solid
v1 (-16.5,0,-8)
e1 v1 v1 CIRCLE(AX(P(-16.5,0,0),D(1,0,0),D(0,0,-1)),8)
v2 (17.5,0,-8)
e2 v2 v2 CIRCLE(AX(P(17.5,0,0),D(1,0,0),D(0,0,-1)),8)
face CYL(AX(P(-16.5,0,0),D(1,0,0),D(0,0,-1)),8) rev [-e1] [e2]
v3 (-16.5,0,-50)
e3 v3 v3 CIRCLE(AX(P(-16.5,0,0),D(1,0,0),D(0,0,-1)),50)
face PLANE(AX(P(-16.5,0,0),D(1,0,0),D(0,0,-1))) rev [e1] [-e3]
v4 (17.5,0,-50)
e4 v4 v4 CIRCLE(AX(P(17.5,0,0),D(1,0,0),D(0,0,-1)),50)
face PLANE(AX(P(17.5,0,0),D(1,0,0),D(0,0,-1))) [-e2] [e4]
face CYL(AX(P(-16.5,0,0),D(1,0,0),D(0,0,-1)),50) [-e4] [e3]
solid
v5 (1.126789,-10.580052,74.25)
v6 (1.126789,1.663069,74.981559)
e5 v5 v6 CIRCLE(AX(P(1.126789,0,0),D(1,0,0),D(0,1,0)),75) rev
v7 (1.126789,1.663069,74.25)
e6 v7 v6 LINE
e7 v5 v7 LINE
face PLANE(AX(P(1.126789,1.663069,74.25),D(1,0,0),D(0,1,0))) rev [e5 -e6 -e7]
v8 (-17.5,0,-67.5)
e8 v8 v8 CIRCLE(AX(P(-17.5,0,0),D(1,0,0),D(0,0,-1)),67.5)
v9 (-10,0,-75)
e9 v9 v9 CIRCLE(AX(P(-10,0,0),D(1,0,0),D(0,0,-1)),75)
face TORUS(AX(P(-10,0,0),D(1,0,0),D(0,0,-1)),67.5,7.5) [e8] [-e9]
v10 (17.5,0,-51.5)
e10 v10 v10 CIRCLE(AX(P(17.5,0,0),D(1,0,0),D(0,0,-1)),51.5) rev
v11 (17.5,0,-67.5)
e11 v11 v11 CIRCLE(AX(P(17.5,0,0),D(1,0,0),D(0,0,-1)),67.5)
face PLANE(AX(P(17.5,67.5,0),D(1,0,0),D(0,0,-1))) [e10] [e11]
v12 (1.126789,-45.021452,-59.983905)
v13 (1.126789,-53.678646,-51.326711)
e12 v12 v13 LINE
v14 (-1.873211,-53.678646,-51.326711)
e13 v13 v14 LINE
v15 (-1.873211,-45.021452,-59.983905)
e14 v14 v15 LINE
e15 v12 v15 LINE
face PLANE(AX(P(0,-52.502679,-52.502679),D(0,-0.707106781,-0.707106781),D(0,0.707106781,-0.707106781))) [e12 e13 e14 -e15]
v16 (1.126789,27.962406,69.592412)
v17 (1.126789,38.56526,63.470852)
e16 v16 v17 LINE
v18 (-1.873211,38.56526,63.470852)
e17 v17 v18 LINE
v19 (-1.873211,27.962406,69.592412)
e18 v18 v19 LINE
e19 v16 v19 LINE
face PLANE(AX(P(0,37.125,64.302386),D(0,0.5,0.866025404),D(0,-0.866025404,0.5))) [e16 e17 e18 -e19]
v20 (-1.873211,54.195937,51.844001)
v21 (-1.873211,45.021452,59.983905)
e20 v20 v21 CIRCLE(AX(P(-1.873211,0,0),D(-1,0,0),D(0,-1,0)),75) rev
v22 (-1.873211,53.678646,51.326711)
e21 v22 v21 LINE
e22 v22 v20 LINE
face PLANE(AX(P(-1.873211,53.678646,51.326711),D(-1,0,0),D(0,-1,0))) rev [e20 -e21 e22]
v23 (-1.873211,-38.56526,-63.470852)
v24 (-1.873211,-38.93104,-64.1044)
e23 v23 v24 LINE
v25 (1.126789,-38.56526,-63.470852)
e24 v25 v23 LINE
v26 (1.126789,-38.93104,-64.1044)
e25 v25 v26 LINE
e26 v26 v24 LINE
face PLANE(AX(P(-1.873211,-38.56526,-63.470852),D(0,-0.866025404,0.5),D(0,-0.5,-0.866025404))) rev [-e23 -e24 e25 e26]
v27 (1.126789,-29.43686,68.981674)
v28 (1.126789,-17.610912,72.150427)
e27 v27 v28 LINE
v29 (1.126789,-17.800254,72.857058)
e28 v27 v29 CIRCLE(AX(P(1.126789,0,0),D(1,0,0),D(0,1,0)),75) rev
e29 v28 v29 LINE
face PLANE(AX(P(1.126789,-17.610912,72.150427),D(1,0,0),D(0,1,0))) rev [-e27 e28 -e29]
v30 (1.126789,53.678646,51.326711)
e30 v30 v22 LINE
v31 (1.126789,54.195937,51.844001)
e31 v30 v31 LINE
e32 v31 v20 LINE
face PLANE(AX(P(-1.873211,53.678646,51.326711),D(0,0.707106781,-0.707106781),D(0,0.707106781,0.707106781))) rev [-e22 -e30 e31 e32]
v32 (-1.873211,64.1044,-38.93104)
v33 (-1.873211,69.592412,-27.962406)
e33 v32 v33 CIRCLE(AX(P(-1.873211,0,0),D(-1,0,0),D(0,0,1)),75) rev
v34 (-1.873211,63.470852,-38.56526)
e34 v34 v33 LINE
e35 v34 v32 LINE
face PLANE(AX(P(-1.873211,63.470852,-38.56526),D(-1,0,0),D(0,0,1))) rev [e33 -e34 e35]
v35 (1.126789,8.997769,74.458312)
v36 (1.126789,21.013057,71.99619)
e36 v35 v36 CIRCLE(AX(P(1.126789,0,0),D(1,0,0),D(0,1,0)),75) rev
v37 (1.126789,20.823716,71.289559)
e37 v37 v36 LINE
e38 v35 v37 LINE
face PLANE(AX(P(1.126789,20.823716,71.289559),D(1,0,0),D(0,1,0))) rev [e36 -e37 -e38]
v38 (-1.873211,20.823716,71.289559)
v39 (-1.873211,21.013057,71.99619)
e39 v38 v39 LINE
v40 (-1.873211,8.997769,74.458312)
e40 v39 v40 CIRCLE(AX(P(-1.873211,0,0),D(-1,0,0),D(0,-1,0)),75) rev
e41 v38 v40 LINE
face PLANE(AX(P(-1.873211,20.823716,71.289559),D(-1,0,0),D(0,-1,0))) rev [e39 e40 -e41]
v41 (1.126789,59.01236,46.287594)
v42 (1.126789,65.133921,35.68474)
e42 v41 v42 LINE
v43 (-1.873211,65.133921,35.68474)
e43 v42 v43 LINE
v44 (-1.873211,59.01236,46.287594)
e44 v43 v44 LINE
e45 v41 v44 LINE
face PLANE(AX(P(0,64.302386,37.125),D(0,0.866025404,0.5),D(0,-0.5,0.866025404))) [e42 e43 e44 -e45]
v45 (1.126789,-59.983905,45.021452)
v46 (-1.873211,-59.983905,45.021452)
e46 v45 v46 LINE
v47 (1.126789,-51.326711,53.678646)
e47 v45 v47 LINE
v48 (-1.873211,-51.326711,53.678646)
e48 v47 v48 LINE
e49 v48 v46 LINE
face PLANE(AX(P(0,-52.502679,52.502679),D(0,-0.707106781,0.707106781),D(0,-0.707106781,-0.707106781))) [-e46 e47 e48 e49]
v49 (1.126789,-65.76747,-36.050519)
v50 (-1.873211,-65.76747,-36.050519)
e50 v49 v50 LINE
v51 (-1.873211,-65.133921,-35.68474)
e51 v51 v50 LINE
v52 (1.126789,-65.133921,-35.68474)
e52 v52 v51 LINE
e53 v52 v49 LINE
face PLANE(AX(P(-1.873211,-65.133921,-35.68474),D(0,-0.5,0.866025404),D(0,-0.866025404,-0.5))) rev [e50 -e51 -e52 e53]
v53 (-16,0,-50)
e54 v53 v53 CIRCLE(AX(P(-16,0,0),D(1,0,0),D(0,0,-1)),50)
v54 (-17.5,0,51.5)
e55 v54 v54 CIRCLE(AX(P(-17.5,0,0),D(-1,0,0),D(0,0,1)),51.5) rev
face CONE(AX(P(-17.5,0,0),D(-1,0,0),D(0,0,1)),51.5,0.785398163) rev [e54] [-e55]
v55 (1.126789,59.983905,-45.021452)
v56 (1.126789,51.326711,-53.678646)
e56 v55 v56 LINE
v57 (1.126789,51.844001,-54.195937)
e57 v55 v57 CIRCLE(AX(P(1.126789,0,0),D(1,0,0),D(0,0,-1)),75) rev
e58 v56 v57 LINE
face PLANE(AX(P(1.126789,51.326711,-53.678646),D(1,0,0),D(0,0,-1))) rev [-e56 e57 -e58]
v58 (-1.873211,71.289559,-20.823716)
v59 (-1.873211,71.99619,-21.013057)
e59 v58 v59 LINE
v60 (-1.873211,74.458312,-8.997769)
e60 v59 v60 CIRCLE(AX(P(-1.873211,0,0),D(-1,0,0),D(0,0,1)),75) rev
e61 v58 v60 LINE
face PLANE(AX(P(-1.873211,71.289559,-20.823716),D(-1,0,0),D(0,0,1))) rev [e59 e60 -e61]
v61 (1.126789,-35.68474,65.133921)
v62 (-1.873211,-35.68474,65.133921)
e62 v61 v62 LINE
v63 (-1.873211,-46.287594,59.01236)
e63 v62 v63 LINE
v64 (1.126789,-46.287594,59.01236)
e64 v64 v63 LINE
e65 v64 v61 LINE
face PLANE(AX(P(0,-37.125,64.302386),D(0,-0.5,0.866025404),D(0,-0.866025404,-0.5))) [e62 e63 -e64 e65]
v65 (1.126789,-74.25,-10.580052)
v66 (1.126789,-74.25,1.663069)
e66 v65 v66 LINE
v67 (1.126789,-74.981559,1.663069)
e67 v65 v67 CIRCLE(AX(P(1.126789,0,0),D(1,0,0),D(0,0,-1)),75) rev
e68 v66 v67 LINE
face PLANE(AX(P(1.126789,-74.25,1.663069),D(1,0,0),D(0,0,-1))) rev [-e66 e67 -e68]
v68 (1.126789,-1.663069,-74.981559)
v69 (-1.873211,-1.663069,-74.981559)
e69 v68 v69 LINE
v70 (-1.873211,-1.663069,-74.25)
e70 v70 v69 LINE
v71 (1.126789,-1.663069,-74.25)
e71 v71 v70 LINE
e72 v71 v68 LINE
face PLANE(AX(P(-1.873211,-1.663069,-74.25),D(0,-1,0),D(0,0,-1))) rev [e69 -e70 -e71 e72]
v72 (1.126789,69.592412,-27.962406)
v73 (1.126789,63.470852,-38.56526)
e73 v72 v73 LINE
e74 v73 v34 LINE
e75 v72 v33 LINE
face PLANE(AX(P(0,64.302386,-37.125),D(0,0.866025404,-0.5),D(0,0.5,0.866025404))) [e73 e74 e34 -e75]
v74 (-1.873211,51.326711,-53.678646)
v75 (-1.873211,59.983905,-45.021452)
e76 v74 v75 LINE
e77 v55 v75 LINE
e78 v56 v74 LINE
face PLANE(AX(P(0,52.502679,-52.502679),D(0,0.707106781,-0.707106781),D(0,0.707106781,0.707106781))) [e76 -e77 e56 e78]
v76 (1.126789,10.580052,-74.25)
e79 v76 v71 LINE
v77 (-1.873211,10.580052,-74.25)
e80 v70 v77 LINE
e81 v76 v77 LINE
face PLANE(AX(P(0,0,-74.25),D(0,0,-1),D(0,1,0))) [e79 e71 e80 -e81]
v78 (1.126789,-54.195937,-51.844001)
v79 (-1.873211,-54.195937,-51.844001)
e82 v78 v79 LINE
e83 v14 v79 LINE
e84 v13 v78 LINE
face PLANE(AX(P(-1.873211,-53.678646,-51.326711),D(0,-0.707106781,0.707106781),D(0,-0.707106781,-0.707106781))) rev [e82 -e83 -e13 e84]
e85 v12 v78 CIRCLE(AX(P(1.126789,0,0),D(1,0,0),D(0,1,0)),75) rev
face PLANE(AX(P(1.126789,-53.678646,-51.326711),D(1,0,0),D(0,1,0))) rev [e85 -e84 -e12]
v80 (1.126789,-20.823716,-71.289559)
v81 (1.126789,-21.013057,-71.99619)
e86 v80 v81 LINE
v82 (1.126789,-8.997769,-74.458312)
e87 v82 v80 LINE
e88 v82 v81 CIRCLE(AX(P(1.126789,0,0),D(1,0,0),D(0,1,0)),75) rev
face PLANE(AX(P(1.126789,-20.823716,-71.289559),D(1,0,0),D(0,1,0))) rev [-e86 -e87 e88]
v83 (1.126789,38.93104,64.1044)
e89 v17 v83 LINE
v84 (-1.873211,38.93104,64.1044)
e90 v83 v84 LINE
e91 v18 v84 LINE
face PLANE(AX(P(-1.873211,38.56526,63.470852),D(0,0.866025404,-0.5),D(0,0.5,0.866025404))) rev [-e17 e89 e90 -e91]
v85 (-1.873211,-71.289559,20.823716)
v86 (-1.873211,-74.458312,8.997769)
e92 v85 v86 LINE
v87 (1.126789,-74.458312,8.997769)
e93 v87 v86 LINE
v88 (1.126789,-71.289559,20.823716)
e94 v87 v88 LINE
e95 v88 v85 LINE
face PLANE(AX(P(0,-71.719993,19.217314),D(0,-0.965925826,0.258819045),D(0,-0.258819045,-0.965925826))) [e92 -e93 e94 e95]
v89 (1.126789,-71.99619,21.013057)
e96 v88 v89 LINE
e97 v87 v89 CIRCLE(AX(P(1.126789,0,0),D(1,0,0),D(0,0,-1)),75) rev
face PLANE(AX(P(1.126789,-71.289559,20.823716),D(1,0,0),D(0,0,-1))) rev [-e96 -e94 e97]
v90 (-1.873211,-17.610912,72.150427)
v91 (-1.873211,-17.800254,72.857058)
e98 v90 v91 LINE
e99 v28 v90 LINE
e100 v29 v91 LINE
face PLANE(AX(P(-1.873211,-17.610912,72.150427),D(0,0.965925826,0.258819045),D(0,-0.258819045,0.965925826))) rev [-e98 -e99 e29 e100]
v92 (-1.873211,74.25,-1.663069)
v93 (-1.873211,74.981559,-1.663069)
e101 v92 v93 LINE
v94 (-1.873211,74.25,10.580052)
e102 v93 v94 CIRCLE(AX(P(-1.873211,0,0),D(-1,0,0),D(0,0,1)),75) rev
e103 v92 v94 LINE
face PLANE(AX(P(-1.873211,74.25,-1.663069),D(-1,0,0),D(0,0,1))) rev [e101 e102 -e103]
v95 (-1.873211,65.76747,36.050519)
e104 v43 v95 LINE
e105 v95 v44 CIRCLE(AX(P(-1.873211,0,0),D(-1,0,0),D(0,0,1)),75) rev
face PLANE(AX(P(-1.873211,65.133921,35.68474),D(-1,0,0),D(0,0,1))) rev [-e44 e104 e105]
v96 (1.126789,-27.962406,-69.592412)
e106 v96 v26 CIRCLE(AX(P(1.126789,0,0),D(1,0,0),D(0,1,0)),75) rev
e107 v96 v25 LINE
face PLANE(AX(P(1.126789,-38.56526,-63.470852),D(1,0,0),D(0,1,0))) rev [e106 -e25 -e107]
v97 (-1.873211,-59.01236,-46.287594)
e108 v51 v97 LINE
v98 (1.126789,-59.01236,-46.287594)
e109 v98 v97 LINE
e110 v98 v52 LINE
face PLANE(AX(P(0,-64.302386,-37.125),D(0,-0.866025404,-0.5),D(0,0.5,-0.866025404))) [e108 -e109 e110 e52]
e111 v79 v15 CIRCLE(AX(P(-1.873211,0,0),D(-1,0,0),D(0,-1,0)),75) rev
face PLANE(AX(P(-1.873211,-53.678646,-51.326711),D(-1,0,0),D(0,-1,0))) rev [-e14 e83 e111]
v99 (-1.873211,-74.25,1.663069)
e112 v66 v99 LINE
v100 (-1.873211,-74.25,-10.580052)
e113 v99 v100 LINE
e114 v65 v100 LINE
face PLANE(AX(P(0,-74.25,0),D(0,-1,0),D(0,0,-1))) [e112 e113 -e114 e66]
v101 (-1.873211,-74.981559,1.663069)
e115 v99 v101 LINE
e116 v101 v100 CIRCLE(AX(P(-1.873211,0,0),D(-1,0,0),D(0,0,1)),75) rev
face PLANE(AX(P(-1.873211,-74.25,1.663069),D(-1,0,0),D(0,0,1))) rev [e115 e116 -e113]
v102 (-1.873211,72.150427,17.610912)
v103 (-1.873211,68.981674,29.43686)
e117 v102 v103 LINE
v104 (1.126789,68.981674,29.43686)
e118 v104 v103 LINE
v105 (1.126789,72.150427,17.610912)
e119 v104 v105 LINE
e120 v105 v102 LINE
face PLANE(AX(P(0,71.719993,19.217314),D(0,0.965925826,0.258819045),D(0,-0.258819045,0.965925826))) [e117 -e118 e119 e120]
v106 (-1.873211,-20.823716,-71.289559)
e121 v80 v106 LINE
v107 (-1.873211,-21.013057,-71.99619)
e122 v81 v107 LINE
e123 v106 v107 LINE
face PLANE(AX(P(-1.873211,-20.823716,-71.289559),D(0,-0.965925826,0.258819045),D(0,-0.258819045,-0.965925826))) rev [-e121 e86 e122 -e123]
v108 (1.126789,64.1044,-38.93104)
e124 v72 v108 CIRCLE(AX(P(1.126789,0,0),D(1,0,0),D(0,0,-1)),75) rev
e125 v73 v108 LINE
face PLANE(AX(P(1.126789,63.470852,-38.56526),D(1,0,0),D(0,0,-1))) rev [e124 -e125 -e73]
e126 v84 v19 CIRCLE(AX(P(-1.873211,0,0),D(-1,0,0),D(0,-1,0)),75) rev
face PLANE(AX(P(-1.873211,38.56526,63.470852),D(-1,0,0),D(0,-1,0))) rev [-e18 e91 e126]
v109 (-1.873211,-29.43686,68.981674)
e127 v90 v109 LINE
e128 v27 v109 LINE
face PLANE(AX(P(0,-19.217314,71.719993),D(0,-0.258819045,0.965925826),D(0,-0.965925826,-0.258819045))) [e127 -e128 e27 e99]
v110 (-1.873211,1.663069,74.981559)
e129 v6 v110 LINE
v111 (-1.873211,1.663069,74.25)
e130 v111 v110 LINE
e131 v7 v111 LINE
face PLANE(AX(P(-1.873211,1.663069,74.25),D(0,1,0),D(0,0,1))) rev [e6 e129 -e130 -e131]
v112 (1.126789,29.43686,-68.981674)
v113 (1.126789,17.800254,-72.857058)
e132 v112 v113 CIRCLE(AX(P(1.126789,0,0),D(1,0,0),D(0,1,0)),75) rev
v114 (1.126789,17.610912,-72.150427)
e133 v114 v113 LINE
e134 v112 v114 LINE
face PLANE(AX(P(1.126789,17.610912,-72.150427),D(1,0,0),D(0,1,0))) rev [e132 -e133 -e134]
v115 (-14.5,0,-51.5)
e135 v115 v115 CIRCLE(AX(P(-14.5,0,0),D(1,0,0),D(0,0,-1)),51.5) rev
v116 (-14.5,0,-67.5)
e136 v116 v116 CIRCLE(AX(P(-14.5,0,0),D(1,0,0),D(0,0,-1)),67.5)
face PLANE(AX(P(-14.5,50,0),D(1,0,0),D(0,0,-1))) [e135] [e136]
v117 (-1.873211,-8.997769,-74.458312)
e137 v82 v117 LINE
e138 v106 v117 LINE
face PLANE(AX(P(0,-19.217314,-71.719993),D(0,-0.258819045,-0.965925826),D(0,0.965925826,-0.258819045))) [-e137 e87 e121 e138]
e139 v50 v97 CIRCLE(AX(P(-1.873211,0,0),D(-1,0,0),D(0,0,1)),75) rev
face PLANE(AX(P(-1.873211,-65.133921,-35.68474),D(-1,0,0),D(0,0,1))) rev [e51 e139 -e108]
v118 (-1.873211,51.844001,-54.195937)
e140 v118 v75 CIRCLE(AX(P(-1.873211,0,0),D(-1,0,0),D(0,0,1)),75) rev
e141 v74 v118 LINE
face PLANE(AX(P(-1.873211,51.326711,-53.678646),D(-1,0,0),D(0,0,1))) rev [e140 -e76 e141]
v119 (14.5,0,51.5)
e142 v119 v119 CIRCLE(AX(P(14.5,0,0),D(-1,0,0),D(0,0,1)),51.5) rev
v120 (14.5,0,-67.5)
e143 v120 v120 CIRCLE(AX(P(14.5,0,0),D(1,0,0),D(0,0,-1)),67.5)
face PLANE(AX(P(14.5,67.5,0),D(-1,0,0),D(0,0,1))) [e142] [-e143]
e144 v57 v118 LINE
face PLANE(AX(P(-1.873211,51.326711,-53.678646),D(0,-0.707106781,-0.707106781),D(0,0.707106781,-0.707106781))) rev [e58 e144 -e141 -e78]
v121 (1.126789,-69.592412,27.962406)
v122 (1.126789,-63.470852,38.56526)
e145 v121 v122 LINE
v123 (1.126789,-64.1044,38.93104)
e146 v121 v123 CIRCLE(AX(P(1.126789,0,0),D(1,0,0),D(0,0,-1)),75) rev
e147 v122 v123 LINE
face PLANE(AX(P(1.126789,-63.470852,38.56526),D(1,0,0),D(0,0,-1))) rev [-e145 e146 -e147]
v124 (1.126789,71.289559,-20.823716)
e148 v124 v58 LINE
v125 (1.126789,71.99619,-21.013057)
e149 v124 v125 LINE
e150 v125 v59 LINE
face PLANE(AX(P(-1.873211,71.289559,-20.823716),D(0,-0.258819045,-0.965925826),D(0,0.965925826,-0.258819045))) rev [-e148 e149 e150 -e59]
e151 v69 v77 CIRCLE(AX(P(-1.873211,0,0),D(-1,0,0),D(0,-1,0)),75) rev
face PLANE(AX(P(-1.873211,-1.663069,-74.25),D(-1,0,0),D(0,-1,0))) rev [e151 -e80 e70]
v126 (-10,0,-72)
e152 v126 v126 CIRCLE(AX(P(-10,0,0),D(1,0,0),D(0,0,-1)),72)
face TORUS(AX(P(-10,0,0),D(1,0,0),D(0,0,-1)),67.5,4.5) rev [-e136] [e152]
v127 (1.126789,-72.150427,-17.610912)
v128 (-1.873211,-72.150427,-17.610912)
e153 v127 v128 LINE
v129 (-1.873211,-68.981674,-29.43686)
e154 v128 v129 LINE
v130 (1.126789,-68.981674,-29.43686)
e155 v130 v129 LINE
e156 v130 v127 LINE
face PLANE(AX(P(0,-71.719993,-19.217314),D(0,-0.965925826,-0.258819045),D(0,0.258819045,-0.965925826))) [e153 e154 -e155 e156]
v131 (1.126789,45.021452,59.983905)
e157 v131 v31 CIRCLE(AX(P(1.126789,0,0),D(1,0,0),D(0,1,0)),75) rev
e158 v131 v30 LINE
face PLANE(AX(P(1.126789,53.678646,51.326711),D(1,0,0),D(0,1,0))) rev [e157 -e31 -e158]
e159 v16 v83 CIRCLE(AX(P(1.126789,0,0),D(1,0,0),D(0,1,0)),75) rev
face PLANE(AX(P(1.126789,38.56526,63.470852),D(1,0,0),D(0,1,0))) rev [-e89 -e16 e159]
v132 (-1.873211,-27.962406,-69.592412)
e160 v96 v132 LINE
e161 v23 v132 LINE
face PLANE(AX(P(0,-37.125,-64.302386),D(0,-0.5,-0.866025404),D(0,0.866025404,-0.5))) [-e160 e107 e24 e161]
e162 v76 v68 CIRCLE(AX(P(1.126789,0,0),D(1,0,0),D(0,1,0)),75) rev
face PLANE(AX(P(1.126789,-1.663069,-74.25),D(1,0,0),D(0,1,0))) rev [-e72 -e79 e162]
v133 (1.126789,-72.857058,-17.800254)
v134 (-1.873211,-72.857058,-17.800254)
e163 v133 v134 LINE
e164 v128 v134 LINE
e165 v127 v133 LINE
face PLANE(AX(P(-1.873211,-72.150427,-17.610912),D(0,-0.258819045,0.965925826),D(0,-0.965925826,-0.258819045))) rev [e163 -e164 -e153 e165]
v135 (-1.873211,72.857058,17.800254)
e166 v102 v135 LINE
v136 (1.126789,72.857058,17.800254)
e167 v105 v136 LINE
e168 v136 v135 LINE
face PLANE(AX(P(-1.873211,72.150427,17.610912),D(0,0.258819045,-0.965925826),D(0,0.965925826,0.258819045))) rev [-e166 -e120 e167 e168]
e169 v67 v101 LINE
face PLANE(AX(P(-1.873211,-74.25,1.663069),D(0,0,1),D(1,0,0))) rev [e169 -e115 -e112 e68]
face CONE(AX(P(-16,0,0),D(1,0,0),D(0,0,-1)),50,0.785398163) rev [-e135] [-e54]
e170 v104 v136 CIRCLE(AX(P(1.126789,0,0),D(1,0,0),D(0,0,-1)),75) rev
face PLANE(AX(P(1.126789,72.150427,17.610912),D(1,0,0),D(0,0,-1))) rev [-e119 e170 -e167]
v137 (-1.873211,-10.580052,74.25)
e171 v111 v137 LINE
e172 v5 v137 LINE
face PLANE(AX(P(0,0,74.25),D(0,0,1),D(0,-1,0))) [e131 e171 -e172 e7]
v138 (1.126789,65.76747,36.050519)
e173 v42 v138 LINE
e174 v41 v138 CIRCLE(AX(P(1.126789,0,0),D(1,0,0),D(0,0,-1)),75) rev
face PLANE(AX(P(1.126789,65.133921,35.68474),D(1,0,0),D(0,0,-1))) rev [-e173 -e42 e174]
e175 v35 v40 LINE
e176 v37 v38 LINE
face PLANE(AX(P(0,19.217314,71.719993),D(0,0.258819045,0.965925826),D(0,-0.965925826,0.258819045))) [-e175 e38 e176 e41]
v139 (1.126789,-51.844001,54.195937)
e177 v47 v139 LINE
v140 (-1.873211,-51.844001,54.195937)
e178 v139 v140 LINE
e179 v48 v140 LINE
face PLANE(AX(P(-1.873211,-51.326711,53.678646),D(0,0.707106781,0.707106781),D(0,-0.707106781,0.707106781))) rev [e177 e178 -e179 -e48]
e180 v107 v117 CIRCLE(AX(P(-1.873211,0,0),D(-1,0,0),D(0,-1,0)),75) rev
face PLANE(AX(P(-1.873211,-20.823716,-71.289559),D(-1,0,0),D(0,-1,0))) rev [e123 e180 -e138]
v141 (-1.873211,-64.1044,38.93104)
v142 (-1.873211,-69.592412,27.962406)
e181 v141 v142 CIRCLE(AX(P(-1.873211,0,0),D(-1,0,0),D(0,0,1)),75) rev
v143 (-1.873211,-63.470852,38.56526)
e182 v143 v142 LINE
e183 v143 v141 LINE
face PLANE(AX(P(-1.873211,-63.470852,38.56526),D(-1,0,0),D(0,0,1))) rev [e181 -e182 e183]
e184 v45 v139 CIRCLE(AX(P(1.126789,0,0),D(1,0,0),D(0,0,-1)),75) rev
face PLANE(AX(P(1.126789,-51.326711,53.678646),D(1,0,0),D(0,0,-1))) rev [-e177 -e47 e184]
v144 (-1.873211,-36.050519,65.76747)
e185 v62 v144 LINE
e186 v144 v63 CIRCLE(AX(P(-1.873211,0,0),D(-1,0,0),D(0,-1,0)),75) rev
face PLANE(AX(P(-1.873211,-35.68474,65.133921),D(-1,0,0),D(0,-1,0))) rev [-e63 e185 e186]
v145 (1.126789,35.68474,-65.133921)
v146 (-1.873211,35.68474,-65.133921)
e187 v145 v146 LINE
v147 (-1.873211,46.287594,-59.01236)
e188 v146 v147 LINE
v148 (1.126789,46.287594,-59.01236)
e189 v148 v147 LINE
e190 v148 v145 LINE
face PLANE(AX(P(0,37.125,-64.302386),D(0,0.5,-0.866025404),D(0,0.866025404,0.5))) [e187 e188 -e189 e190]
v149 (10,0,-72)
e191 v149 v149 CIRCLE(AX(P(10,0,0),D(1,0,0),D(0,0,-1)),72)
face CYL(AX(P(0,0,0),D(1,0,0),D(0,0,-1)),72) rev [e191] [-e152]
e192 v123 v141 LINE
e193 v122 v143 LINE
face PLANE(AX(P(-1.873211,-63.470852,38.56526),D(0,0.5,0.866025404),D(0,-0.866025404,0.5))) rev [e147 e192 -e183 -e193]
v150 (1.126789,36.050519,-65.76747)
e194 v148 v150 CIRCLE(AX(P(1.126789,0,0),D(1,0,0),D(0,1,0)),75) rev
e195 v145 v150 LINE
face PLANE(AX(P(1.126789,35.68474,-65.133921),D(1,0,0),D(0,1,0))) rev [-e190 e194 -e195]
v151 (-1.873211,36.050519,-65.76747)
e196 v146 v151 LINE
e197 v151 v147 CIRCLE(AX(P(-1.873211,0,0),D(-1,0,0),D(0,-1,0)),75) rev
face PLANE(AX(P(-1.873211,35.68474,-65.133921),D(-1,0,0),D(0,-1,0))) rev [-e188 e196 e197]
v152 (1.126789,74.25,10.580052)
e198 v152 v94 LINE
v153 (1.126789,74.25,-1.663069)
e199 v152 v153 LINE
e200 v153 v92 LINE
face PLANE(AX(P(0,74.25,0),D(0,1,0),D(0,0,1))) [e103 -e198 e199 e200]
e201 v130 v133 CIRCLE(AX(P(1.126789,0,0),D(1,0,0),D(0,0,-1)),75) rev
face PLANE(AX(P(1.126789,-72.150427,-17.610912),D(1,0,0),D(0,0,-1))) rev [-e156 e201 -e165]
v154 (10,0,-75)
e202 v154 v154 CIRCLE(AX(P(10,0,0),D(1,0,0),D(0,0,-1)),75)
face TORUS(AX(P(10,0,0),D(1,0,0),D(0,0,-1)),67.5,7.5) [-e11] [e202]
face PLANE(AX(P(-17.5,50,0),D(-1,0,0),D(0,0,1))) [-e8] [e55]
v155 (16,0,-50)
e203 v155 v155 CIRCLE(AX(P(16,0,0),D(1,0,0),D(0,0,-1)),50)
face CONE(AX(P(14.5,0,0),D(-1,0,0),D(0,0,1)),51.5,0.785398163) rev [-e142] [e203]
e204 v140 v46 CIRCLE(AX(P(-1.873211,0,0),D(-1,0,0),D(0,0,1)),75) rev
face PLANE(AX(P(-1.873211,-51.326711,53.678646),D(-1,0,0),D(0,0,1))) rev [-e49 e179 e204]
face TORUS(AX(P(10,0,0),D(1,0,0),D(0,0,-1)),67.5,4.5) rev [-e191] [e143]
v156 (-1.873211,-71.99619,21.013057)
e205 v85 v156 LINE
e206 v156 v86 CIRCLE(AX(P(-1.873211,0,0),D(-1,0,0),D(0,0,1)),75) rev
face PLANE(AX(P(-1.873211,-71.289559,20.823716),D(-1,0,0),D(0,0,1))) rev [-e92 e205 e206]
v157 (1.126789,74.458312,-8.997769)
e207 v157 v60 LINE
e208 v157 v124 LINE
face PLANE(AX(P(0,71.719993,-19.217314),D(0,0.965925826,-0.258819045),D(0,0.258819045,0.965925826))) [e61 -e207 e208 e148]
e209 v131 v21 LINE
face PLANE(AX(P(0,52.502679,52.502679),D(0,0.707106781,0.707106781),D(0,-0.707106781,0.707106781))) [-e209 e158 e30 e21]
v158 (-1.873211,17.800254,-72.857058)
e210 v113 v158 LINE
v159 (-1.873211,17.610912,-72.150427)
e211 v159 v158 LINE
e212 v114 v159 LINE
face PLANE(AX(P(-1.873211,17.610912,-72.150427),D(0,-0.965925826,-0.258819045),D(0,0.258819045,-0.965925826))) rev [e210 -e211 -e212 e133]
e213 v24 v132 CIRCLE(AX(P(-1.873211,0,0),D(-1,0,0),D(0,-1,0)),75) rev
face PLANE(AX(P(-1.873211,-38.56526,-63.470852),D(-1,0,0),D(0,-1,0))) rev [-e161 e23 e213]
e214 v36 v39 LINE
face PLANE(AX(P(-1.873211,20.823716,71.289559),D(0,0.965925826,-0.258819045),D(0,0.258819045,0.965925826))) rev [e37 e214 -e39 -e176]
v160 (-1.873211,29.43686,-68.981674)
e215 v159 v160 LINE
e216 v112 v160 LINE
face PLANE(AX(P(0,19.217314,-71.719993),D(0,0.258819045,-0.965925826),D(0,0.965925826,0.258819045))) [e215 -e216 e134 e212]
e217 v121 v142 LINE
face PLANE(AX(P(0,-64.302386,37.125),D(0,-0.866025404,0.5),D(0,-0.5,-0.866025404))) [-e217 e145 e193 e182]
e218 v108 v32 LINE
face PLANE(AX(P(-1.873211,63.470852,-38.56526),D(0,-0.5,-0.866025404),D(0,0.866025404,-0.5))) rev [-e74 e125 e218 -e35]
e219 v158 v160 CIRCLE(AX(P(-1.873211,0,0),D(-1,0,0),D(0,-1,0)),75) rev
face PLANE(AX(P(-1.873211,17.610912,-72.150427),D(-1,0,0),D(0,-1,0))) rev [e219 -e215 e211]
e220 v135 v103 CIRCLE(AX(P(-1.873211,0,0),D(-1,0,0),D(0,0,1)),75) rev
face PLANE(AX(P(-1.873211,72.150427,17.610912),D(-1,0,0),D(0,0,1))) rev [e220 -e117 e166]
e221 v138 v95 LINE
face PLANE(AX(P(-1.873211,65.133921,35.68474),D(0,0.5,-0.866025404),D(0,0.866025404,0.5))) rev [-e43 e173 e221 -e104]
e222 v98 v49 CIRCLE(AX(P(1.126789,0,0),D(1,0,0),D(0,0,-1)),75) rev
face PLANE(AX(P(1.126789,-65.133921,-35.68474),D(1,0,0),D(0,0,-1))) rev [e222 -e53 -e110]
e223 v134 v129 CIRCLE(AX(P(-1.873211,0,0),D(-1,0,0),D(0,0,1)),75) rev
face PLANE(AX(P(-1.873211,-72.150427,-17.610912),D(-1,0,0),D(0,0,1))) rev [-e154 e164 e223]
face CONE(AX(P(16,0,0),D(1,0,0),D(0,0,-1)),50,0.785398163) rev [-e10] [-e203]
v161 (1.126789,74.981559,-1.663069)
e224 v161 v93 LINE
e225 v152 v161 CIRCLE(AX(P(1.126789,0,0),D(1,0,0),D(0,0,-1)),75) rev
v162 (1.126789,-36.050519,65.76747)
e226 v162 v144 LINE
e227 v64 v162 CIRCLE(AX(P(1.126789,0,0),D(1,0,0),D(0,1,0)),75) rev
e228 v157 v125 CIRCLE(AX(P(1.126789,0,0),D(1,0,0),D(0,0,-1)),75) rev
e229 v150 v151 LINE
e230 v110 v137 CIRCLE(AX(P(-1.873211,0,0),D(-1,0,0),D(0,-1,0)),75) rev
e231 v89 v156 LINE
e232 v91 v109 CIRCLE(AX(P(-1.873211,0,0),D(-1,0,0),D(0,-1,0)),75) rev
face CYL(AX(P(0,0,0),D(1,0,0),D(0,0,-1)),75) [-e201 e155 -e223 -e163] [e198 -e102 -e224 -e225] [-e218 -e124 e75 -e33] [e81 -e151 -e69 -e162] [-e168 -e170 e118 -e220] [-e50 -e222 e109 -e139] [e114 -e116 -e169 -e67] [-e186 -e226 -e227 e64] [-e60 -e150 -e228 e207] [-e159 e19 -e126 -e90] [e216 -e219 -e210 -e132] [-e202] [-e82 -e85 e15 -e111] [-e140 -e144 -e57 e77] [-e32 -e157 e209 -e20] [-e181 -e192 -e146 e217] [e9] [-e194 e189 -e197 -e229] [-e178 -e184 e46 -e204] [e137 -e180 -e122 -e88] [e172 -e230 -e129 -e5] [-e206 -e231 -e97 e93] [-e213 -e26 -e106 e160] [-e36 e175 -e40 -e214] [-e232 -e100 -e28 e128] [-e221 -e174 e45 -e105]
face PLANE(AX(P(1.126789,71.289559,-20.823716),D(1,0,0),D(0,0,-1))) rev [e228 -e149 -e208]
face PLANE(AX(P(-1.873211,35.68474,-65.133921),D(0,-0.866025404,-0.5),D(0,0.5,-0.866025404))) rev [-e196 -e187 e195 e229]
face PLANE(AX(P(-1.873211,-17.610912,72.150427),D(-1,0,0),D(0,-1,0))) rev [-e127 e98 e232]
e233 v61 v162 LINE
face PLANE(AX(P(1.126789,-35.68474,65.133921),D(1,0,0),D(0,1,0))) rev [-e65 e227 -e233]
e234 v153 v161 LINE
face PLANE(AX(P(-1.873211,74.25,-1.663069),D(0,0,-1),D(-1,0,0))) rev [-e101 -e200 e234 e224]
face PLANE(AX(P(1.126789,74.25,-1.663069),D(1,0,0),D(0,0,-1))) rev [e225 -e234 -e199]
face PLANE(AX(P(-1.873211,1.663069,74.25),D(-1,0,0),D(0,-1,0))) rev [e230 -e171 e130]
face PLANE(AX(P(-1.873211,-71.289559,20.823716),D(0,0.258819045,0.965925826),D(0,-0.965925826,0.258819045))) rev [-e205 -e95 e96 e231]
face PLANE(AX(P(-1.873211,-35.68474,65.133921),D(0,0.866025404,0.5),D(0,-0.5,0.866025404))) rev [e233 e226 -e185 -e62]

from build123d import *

# Parameters (mm, degrees)
CHAMFER1_SIZE       = 1.5
SKETCH3_W           = 3
SKETCH3_H           = 20
CUT_EXTRUDE3_DEPTH  = 0.75
CIRPATTERN2_COUNT   = 24
SKETCH4_R           = 50
SKETCH4_R_2         = 8
BOSS_EXTRUDE1_DEPTH = 34


with BuildPart() as part:
    # Sketch1 → Revolve1 (revolve)
    with BuildSketch(Plane.XY, mode=Mode.PRIVATE) as revolve1_sk:
        with BuildLine():
            Line((-17.5, 50), (-17.5, 67.5))
            ThreePointArc((-17.5, 67.5), (-15.303300859, 72.803300859), (-10, 75))
            Line((-10, 75), (10, 75))
            ThreePointArc((10, 75), (15.303300859, 72.803300859), (17.5, 67.5))
            Line((17.5, 67.5), (17.5, 50))
            Line((17.5, 50), (14.5, 50))
            Line((14.5, 50), (14.5, 67.5))
            ThreePointArc((14.5, 67.5), (13.181980515, 70.681980515), (10, 72))
            Line((10, 72), (-10, 72))
            ThreePointArc((-10, 72), (-13.181980515, 70.681980515), (-14.5, 67.5))
            Line((-14.5, 67.5), (-14.5, 50))
            Line((-14.5, 50), (-17.5, 50))
        make_face()
    revolve(revolve1_sk.sketch.rotate(Axis((0, 0, 0), (-1, 0, 0)), 90), axis=Axis((0, 0, 0), (-1, 0, 0)))

    # Chamfer1
    chamfer1_edges = [part.edges().sort_by_distance(p)[0] for p in [
        (14.5, 0, 50),
        (17.5, 0, 50),
        (-17.5, 0, 50),
        (-14.5, 0, 50),
    ]]
    chamfer(chamfer1_edges, length=CHAMFER1_SIZE - 0.0001)  # a hair under: the kernel refuses the full size

    # Sketch3 → Cut-Extrude3 (cut, symmetric)
    with BuildSketch(Plane(origin=(0, 75, 0), x_dir=(1, 0, 0), z_dir=(0, 1, 0))):
        with Locations((-0.373210741, -8.336930551)):
            Rectangle(SKETCH3_W, SKETCH3_H)
    cut_extrude3 = extrude(amount=CUT_EXTRUDE3_DEPTH, both=True, mode=Mode.SUBTRACT)

    # CirPattern2: Cut-Extrude3 ×24 about axis
    cirpattern2_axis = Axis((0, 0, 0), (1, 0, 0))
    for i in range(1, CIRPATTERN2_COUNT):
        add(cut_extrude3.rotate(cirpattern2_axis, i * 360 / CIRPATTERN2_COUNT), mode=Mode.SUBTRACT)


with BuildPart() as body_2:
    # Sketch4 → Boss-Extrude1 (new body)
    with BuildSketch(Plane(origin=(17.5, 0, 0), x_dir=(0, 0, -1), z_dir=(1, 0, 0))):
        Circle(SKETCH4_R)
        Circle(SKETCH4_R_2, mode=Mode.SUBTRACT)
    extrude(amount=-BOSS_EXTRUDE1_DEPTH)


solid = Compound([part.part, body_2.part])
